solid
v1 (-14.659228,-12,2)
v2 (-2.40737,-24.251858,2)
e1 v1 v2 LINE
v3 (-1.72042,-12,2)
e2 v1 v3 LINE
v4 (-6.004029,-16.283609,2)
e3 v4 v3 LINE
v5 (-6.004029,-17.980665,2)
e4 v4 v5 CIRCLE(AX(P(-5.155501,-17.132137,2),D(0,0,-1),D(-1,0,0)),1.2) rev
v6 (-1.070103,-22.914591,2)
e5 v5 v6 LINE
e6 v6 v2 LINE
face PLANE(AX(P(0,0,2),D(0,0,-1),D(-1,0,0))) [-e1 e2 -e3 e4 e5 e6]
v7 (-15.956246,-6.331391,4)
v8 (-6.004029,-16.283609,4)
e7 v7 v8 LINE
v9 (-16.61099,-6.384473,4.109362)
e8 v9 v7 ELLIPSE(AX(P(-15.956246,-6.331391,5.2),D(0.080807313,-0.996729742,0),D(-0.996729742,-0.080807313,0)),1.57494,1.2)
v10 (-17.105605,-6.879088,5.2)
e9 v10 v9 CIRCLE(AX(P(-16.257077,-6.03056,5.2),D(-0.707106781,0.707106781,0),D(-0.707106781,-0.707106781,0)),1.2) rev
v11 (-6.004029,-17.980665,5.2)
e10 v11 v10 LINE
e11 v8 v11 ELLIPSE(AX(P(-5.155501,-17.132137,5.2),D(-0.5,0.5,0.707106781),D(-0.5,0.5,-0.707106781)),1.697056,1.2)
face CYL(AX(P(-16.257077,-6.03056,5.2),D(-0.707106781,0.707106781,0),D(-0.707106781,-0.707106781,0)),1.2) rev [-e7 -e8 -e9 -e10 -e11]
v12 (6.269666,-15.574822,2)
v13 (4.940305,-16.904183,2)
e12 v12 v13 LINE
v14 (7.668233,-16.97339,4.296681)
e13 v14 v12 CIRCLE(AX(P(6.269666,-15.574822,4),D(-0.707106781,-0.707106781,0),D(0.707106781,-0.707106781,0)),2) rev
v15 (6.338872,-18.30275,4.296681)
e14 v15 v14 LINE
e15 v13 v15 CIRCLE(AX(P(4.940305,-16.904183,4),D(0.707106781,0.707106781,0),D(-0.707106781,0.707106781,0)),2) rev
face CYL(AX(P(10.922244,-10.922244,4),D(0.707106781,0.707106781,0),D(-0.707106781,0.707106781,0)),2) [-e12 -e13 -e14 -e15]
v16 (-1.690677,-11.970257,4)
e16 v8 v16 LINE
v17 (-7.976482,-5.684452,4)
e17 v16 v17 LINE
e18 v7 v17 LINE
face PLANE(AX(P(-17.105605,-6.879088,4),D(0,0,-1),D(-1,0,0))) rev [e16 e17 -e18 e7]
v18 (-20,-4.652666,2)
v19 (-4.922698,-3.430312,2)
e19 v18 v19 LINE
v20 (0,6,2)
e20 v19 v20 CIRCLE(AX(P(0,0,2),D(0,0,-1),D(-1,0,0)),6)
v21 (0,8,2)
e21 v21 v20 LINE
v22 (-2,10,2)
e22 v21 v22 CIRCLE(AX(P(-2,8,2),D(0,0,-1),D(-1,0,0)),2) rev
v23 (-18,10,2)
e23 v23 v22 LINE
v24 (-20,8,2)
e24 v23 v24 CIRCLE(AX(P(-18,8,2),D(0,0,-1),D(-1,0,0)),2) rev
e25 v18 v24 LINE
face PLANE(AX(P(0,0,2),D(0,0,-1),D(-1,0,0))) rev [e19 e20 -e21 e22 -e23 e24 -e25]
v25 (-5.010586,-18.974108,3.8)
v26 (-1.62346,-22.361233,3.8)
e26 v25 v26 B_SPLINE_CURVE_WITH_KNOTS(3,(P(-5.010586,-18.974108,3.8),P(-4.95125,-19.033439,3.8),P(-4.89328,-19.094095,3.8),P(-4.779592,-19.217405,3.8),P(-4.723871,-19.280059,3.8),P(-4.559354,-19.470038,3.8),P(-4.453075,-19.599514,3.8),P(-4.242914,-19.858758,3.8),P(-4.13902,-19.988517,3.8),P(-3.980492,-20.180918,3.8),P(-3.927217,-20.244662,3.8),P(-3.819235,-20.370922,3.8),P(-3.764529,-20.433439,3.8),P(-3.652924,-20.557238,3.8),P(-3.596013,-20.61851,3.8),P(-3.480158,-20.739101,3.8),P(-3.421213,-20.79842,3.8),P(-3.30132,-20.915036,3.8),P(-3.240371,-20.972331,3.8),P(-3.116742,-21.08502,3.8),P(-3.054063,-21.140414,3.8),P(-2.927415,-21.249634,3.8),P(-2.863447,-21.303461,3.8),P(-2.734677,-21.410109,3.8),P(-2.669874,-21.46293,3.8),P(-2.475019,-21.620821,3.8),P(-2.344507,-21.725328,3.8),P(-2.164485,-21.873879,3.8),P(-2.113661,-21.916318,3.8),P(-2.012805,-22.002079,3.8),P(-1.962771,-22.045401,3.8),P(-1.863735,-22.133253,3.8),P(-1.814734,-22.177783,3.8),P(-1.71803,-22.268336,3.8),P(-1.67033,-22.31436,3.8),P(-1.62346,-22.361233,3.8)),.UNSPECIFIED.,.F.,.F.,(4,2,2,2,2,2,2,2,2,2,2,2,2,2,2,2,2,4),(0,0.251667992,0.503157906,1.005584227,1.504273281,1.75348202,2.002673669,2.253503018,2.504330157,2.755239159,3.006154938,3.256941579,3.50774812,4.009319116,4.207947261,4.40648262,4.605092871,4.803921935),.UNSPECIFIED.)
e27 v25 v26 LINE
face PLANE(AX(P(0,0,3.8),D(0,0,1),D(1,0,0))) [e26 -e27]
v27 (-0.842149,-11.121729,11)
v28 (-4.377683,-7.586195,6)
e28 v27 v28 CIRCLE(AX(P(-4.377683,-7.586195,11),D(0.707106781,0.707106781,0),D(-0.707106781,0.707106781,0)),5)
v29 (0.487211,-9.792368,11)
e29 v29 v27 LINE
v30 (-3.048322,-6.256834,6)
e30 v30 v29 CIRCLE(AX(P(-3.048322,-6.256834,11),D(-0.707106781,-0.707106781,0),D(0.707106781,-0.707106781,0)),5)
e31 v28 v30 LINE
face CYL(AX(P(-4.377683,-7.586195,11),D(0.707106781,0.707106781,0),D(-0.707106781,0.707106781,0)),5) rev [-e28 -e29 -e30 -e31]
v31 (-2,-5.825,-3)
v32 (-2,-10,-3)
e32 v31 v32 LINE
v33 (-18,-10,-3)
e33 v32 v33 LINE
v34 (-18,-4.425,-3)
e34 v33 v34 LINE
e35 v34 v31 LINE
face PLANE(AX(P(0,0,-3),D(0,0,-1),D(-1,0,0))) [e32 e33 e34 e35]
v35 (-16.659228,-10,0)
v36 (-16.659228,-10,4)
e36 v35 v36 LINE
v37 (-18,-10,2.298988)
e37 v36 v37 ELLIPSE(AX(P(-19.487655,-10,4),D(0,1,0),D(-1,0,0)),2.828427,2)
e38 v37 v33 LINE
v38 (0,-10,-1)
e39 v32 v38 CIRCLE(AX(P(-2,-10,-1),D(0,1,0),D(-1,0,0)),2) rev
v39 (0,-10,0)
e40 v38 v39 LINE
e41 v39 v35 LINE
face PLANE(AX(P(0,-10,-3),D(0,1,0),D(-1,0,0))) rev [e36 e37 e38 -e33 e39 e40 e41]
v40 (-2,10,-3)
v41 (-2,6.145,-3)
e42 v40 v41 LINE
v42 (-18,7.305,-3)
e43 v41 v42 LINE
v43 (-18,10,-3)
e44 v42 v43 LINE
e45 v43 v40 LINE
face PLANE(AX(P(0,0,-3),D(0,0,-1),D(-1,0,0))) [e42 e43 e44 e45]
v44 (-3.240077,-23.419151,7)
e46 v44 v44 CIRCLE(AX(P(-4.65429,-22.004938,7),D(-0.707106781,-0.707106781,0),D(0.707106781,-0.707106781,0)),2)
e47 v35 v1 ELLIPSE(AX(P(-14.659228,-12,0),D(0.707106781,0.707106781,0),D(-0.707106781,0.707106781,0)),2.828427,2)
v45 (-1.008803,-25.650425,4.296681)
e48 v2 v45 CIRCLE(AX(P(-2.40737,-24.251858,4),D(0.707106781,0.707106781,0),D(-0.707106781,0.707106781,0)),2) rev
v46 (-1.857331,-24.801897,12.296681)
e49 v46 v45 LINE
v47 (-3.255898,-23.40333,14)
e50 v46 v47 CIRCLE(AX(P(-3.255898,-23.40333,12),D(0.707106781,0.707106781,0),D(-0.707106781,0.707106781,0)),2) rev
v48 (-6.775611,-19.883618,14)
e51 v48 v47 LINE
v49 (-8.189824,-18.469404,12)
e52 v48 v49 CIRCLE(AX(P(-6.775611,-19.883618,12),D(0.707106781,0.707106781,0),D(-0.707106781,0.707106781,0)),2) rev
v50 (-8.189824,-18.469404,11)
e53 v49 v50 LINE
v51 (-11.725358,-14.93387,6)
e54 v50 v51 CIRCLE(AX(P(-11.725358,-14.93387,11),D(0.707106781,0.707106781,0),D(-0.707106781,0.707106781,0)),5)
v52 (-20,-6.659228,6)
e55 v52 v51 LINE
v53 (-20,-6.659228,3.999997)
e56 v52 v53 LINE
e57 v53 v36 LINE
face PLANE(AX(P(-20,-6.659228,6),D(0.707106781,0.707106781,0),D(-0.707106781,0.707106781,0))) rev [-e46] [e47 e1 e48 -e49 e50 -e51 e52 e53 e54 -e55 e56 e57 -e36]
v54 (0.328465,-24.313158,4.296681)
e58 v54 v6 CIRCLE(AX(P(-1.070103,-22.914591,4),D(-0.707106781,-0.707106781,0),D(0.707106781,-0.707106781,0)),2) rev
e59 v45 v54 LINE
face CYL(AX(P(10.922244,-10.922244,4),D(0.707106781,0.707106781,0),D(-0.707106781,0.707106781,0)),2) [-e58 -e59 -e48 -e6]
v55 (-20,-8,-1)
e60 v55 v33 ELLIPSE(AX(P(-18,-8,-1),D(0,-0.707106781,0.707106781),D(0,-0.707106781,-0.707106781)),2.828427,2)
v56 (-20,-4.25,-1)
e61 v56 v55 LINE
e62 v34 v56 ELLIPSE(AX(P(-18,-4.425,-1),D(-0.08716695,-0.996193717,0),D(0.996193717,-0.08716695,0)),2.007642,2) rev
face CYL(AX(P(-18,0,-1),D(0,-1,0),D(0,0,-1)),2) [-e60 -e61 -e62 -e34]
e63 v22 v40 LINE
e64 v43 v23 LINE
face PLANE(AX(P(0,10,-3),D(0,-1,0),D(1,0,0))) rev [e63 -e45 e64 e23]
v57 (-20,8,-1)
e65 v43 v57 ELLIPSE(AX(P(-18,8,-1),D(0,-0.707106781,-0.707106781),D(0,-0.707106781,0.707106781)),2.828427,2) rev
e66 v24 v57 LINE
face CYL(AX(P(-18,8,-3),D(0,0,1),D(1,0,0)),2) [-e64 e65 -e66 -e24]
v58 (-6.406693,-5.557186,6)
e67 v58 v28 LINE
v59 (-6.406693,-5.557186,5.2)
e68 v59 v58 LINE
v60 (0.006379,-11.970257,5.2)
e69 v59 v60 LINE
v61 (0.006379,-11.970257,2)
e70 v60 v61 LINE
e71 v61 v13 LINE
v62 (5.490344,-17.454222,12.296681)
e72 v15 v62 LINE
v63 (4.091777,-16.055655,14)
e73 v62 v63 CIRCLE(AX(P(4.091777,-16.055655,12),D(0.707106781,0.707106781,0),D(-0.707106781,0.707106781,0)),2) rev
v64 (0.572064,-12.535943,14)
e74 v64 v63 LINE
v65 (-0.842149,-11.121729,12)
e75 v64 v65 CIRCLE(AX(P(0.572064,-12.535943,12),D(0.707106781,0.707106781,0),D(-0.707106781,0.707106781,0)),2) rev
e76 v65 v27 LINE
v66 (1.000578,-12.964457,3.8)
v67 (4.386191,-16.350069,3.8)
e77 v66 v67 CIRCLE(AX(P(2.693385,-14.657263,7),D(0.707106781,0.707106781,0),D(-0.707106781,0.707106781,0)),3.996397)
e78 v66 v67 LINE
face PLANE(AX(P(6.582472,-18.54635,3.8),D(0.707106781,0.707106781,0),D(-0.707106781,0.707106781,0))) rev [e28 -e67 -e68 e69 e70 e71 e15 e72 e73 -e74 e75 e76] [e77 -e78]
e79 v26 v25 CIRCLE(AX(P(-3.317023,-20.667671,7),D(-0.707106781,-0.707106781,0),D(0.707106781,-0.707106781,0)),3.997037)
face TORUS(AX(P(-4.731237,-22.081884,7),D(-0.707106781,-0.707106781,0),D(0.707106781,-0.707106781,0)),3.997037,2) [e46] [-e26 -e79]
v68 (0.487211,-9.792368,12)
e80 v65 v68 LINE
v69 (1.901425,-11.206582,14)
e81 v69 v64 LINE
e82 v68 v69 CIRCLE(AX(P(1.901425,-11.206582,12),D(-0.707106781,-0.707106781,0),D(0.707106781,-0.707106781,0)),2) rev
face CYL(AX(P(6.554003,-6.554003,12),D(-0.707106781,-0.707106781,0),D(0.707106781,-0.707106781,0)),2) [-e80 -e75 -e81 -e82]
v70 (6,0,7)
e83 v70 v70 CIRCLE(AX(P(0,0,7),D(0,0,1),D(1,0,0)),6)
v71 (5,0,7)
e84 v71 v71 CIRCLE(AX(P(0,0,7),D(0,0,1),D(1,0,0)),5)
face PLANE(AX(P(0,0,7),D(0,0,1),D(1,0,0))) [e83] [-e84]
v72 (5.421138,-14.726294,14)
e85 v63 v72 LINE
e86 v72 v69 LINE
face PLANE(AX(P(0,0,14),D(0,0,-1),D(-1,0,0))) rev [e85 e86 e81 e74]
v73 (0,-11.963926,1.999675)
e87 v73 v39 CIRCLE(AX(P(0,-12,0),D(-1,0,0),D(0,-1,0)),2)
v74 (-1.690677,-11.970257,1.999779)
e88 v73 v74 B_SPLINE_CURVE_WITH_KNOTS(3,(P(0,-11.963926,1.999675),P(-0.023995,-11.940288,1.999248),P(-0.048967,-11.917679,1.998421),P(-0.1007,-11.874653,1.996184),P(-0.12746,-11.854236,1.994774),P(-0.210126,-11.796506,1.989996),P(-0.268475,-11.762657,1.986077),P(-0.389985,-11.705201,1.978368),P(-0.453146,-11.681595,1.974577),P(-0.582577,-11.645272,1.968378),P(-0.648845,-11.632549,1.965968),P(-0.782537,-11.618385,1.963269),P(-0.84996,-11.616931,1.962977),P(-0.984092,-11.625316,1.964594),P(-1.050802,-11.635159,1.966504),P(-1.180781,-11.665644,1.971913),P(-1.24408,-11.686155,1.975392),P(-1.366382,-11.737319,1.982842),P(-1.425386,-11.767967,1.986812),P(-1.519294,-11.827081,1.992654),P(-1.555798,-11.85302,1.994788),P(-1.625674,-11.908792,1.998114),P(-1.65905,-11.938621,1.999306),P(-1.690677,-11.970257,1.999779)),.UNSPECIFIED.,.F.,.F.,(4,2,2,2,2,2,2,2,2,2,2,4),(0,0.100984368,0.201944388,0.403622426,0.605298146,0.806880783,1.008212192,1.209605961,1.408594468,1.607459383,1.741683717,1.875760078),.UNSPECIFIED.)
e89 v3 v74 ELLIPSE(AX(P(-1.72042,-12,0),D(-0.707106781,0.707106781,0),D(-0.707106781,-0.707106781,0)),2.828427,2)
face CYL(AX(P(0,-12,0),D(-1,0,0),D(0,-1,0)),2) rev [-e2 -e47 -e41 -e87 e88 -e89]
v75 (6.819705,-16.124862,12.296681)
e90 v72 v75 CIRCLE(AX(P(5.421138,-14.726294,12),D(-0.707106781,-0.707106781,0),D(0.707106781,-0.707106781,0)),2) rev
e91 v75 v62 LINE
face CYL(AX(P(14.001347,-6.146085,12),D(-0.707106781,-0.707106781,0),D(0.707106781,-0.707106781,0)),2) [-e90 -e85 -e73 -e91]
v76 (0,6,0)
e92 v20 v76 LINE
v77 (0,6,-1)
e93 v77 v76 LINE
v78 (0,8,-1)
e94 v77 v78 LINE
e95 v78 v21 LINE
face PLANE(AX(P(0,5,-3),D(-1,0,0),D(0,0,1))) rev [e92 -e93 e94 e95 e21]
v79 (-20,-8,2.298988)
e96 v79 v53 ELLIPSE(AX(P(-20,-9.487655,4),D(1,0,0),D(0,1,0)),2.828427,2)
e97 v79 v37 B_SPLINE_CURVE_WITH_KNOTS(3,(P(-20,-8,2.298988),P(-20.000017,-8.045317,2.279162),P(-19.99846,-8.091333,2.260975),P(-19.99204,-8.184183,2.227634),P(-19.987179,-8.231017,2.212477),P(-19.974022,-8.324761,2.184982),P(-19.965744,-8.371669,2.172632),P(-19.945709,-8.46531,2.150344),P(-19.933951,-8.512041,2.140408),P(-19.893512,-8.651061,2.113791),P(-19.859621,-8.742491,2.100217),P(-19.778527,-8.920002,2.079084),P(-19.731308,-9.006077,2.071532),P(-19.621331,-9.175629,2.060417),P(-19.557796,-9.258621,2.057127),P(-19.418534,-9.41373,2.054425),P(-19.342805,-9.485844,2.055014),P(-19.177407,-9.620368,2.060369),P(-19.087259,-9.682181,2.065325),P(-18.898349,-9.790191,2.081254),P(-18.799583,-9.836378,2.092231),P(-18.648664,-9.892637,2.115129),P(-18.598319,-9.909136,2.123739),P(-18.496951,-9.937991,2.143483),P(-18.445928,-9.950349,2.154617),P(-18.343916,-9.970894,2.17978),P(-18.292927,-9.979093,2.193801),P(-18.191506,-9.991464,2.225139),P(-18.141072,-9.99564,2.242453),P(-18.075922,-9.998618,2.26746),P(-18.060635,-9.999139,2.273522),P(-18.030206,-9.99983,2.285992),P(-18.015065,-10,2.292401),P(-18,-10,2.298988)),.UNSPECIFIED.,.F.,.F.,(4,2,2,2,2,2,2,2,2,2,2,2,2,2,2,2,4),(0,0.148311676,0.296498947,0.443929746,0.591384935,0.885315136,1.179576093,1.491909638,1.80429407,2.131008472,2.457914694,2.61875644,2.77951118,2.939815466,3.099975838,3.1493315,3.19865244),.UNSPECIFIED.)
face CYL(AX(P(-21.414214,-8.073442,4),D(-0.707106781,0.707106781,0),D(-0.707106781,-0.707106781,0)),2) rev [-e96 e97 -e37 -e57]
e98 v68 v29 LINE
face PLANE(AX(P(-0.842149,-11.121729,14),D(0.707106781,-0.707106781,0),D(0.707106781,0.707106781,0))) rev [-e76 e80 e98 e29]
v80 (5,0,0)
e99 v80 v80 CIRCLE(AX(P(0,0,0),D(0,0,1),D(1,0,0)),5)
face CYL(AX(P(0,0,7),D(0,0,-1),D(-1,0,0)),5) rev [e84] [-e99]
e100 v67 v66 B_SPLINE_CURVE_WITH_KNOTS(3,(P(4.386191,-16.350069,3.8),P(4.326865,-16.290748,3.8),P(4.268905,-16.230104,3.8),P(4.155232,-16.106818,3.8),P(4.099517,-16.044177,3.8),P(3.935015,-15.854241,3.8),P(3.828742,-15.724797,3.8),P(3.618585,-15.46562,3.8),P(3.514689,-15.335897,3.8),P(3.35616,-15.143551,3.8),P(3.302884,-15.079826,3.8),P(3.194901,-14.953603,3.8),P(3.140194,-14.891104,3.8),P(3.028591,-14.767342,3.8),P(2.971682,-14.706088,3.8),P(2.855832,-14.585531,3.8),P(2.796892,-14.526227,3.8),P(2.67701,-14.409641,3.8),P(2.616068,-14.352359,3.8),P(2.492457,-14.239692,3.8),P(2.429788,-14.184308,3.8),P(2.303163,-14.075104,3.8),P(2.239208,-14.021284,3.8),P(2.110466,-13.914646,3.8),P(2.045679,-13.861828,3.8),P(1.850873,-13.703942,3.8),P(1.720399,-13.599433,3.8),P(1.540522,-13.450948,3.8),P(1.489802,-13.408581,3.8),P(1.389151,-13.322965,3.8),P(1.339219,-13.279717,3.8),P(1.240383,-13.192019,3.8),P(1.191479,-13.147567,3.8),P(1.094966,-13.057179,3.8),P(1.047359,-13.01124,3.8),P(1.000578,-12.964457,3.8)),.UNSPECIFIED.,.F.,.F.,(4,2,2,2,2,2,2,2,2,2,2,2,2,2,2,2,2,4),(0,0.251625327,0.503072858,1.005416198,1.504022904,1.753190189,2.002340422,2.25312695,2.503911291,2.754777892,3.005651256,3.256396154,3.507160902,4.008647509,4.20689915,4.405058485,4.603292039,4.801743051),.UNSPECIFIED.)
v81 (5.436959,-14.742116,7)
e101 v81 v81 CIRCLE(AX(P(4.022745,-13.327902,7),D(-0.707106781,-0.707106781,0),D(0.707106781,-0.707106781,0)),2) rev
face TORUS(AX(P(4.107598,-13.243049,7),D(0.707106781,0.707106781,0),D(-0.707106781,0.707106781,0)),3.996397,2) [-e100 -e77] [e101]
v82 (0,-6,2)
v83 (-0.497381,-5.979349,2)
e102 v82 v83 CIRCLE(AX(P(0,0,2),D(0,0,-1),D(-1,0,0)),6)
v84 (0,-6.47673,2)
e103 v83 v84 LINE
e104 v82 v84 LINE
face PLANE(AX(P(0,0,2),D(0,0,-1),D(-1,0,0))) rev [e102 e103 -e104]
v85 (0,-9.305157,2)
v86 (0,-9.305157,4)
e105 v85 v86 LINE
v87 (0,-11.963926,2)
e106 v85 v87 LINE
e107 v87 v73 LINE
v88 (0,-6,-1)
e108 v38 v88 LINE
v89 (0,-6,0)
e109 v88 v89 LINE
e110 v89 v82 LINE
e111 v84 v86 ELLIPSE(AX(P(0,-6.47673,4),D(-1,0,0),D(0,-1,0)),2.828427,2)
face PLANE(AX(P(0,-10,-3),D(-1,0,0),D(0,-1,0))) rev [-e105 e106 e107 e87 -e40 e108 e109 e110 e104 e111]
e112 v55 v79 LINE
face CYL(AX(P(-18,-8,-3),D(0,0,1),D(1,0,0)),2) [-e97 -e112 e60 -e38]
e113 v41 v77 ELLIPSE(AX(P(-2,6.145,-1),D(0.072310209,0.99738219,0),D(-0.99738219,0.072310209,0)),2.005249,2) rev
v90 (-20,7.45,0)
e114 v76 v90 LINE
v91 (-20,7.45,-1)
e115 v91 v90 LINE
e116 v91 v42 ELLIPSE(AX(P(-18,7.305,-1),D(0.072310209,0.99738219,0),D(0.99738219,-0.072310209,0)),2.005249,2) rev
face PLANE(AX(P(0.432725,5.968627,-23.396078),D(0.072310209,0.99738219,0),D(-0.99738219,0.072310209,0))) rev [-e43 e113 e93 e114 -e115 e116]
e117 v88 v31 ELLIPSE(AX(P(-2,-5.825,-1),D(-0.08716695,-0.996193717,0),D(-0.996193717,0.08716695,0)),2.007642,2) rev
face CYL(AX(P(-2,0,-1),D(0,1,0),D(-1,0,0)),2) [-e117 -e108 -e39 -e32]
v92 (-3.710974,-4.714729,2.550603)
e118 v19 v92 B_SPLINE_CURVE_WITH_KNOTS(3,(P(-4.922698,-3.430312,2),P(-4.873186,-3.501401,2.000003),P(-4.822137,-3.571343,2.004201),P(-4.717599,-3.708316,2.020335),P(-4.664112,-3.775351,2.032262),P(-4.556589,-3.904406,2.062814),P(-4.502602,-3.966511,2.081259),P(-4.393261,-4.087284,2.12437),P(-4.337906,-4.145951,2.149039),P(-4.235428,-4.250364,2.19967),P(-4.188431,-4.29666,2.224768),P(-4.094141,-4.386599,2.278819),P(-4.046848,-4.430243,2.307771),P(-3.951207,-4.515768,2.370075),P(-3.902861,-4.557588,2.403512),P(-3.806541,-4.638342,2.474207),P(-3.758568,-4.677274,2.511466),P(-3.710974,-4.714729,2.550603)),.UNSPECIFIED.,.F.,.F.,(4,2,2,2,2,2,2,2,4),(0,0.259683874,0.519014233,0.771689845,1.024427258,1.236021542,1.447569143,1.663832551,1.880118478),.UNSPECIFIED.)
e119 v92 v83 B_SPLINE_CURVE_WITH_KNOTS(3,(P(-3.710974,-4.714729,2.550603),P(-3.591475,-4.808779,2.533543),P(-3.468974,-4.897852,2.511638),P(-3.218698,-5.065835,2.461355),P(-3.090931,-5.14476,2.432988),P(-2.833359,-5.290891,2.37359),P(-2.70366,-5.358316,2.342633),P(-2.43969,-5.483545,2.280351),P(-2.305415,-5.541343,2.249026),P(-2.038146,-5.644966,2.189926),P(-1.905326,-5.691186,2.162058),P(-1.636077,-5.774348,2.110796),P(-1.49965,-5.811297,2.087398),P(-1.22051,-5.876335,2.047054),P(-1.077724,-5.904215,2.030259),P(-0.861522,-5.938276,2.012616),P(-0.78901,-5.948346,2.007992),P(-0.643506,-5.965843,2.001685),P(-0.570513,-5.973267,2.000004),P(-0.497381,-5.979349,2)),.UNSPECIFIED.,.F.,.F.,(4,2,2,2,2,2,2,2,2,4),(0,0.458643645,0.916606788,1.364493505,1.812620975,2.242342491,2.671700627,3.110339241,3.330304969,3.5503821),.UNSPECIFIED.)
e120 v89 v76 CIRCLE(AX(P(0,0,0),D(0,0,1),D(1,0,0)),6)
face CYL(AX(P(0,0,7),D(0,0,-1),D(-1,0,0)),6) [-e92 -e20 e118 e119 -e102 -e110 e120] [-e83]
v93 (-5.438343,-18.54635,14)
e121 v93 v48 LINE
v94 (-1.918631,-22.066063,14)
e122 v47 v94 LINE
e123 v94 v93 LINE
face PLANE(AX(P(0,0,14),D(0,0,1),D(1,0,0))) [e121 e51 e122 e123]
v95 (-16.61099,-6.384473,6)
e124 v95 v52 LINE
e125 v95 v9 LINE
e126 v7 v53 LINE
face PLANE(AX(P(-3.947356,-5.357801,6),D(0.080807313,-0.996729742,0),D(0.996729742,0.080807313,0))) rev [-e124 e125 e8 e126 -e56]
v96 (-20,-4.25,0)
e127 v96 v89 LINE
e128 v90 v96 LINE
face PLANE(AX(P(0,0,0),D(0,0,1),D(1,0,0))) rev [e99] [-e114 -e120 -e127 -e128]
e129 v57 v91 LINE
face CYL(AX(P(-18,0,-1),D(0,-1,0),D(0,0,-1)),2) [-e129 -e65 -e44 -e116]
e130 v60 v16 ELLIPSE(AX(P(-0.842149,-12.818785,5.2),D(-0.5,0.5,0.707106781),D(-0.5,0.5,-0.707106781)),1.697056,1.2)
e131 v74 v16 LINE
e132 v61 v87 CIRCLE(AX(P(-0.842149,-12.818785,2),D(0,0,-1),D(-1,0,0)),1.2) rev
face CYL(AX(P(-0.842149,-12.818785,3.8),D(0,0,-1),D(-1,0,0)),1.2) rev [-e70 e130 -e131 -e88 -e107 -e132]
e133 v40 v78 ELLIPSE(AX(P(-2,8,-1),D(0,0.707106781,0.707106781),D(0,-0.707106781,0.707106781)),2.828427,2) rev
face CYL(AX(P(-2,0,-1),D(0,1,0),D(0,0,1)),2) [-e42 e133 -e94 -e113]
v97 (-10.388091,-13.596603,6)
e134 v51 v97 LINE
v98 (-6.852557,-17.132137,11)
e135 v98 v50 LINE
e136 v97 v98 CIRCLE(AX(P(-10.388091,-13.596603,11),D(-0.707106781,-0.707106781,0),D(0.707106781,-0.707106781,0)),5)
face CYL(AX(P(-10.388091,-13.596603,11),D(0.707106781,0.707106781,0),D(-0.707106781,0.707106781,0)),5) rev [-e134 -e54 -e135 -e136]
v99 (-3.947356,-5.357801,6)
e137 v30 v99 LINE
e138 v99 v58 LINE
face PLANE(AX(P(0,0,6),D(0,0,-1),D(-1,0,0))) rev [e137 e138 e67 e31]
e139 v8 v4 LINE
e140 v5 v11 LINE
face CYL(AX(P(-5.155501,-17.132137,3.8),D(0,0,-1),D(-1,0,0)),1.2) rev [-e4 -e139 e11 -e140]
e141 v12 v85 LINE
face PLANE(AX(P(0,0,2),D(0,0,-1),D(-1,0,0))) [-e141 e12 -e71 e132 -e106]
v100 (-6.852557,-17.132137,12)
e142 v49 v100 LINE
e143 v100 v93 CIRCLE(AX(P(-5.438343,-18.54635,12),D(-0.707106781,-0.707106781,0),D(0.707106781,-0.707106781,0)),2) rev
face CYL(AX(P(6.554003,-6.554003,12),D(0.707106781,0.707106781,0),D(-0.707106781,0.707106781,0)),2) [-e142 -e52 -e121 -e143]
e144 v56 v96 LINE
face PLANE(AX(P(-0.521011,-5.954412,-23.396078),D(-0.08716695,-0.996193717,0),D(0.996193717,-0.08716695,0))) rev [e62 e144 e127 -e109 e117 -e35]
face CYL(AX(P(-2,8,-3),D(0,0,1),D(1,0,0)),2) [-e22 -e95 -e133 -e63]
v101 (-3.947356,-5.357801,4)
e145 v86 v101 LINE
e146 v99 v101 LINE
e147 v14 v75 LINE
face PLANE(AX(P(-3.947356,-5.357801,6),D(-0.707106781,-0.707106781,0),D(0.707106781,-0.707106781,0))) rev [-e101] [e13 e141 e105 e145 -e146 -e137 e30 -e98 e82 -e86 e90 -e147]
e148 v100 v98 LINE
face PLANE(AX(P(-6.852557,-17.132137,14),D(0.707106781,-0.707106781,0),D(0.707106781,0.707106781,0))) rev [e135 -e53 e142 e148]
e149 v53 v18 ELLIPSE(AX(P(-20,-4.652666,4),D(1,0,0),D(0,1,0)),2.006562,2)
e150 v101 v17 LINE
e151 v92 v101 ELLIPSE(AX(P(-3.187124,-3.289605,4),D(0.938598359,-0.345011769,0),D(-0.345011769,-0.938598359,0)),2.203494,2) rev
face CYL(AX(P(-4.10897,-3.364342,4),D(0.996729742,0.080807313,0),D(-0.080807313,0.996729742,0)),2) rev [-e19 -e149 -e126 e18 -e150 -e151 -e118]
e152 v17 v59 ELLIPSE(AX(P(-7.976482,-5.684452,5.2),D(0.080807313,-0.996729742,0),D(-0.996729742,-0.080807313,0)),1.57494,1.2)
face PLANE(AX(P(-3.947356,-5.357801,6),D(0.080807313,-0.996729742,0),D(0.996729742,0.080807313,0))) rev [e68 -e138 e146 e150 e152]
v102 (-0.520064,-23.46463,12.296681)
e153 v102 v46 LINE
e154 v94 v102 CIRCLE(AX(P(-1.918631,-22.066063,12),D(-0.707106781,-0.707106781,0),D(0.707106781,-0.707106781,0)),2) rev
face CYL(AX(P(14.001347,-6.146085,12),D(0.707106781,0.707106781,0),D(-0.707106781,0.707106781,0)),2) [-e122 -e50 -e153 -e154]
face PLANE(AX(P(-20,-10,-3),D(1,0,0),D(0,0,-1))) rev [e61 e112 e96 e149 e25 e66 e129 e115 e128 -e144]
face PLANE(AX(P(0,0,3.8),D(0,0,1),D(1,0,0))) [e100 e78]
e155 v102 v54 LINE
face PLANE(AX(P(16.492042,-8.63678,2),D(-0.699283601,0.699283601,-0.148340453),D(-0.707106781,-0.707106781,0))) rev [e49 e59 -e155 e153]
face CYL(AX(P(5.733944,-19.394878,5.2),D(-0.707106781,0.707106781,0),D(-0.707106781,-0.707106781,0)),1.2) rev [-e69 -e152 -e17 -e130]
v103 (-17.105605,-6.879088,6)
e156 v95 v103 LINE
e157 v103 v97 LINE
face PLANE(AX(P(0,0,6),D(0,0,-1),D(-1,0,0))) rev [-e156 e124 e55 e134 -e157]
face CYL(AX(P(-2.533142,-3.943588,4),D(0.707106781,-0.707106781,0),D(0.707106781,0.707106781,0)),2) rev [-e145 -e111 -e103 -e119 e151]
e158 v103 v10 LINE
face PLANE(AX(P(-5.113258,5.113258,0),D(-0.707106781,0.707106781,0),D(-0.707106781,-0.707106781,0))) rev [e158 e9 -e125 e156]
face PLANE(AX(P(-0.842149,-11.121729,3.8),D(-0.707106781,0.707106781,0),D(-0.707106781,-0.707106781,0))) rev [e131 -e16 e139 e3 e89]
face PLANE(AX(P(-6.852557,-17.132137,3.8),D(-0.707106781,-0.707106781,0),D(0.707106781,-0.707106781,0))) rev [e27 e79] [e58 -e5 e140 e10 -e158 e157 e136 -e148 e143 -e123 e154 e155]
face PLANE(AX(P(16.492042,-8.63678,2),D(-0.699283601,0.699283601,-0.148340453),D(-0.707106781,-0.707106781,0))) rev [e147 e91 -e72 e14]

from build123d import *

# Parameters (mm, degrees)
CROQUIS1_R                   = 6
CROQUIS1_R_2                 = 5
SALIENTE_EXTRUIR1_DEPTH      = 7
SALIENTE_EXTRUIR2_DEPTH      = 3
SALIENTE_EXTRUIR2_DEPTH_BACK = 2
CROQUIS4_W                   = 20
CROQUIS4_H                   = 16.5
CORTAR_EXTRUIR1_DEPTH        = 4
SALIENTE_EXTRUIR7_DEPTH      = 4
CORTAR_EXTRUIR4_DEPTH        = 4
CORTAR_EXTRUIR5_DEPTH        = 2.2
SALIENTE_EXTRUIR9_DEPTH      = 8
CORTAR_EXTRUIR6_REACH        = 36.518
CROQUIS13_R                  = 2
REDONDEO1_R                  = 2
CROQUIS14_W                  = 1.8
CROQUIS14_H                  = 8.5
CORTAR_EXTRUIR7_DEPTH        = 10.5
CROQUIS15_W                  = 2
CROQUIS15_H                  = 8.5
CORTAR_EXTRUIR8_DEPTH        = 14.5
REDONDEO2_R                  = 2
REDONDEO3_R                  = 2
REDONDEO4_R                  = 5
CORTAR_EXTRUIR9_REACH        = 36.518
REDONDEO5_R                  = 2
REDONDEO6_R                  = 1.2
SALIENTE_EXTRUIR12_START     = 1
SALIENTE_EXTRUIR12_DEPTH     = 1
SALIENTE_EXTRUIR13_DEPTH     = 3
REDONDEO7_R                  = 2


with BuildPart() as part:
    # Croquis1 → Saliente-Extruir1 (new body)
    with BuildSketch(Plane.XY):
        Circle(CROQUIS1_R)
        Circle(CROQUIS1_R_2, mode=Mode.SUBTRACT)
    extrude(amount=SALIENTE_EXTRUIR1_DEPTH)

    # Croquis2 → Saliente-Extruir2 (add, two sides: drawn at the far end of the back side and taken through both)
    with BuildSketch(Plane(origin=(0, 0, 0), x_dir=(-1, 0, 0), z_dir=(0, 0, -1)).offset(-SALIENTE_EXTRUIR2_DEPTH_BACK)):
        with BuildLine():
            Line((0, -10), (0, -5))
            ThreePointArc((0, -5), (5, 0), (0, 5))
            Line((0, 5), (0, 10))
            Line((0, 10), (20, 10))
            Line((20, 10), (20, -10))
            Line((20, -10), (0, -10))
        make_face()
    extrude(amount=SALIENTE_EXTRUIR2_DEPTH + SALIENTE_EXTRUIR2_DEPTH_BACK)

    # Croquis4 → Cortar-Extruir1 (cut)
    with BuildSketch(Plane(origin=(0, 0, -3), x_dir=(-1, 0, 0), z_dir=(0, 0, -1))):
        with Locations((10, 0)):
            Rectangle(CROQUIS4_W, CROQUIS4_H)
    extrude(amount=-CORTAR_EXTRUIR1_DEPTH, mode=Mode.SUBTRACT)

    # Croquis5 → Saliente-Extruir7 (add)
    with BuildSketch(Plane.XY.offset(2)):
        Polygon((-3.9473557, -5.357801084), (-20, -6.659228144), (0.707205479, -27.366433624), (16.75984978, -26.065006564), align=None)
    extrude(amount=SALIENTE_EXTRUIR7_DEPTH)

    # Croquis10 → Cortar-Extruir4 (cut)
    with BuildSketch(Plane.XY.offset(6)):
        Polygon((-0.765202985, -25.894025159), (7.911832695, -17.216989479), (16.75984978, -26.065006564), (0.707205479, -27.366433624), align=None)
    extrude(amount=-CORTAR_EXTRUIR4_DEPTH, mode=Mode.SUBTRACT)

    # Croquis11 → Cortar-Extruir5 (cut)
    with BuildSketch(Plane.XY.offset(6)):
        Polygon((0.572064306, -24.556757867), (6.582471946, -18.546350227), (-0.842149256, -11.121729025), (-6.852556896, -17.132136665), align=None)
    extrude(amount=-CORTAR_EXTRUIR5_DEPTH, mode=Mode.SUBTRACT)

    # Croquis12 → Saliente-Extruir9 (add)
    with BuildSketch(Plane.XY.offset(6)):
        Polygon((-6.852556896, -17.132136665), (-8.189824188, -18.469403956), (-0.765202985, -25.894025159), (0.572064306, -24.556757867), align=None)
        Polygon((-0.842149256, -11.121729025), (0.487211492, -9.792368276), (7.911832695, -17.216989479), (6.582471946, -18.546350227), align=None)
    extrude(amount=SALIENTE_EXTRUIR9_DEPTH)

    # Cortar-Extruir6: up to this face of the body (flat: up to its plane)
    cortar_extruir6_end = Plane(part.part.faces().sort_by_distance((3.21499462, -12.520151404, 7.335855075))[0])
    # Croquis13 → Cortar-Extruir6 (cut, up to the picked face)
    with BuildSketch(Plane(origin=(-13.329614072, -13.329614072, 0), x_dir=(0, 0, 1), z_dir=(-0.7071067811865488, -0.7071067811865462, 0)), mode=Mode.PRIVATE) as cortar_extruir6_sk1:
        with Locations(Location((7, -12.268760562, 0), (0, 0, 270))):
            Circle(CROQUIS13_R)
    cortar_extruir6_tool1 = split(extrude(cortar_extruir6_sk1.sketch, amount=-CORTAR_EXTRUIR6_REACH, mode=Mode.PRIVATE), bisect_by=cortar_extruir6_end, keep=Keep.BOTH, mode=Mode.PRIVATE)
    add(cortar_extruir6_tool1.solids().sort_by(Axis((-4.65429, -22.004938, 7), (0.7071067811865488, 0.7071067811865462, 0)))[0], mode=Mode.SUBTRACT)

    # Redondeo1
    # the kernel refuses this fillet: 2 mm, written as the material it takes off along each edge
    with BuildSketch(Plane(origin=(-3.31702299, -20.667670571, 7), x_dir=(0.7071067811865459, -0.7071067811865492, 0), z_dir=(0, 0, -1))) as redondeo1_piece_1_section:
        with BuildLine():
            CenterArc((3.997037442, 2), REDONDEO1_R, 183.11895941, 86.88104059)
            Line((2, 1.89118154), (1.960059251, 1.889005171))
            ThreePointArc((1.960059251, 1.889005171), (1.96, 0.94559077), (1.96, 0))
            Line((1.96, 0), (2, -0.04))
            Line((2, -0.04), (3.997037442, -0.04))
            Line((3.997037442, -0.04), (3.997037442, 0))
        make_face()
    redondeo1_piece_1 = revolve(axis=Axis((-3.31702299, -20.667670571, 7), (-0.7071067811865488, -0.7071067811865462, 0)), mode=Mode.PRIVATE)
    redondeo1_piece_1 = split(redondeo1_piece_1, bisect_by=Plane(origin=(-3.31702299, -20.667670571, 3.8), z_dir=(0, 0, 1)), keep=Keep.TOP, mode=Mode.PRIVATE)
    add(redondeo1_piece_1, mode=Mode.SUBTRACT)
    with BuildSketch(Plane(origin=(2.69338465, -14.657262931, 7), x_dir=(0.7071067811865458, -0.7071067811865493, 0), z_dir=(0, 0, -1))) as redondeo1_piece_2_section:
        with BuildLine():
            CenterArc((3.996396754, -2), REDONDEO1_R, 90, 86.560187232)
            Line((3.996396754, 0), (3.996396754, 0.04))
            Line((3.996396754, 0.04), (2, 0.04))
            Line((2, 0.04), (1.96, 0))
            ThreePointArc((1.96, 0), (1.96, -0.94), (1.960072065, -1.8776))
            Line((1.960072065, -1.8776), (2, -1.88))
        make_face()
    redondeo1_piece_2 = revolve(axis=Axis((2.69338465, -14.657262931, 7), (-0.7071067811865488, -0.7071067811865462, 0)), mode=Mode.PRIVATE)
    redondeo1_piece_2 = split(redondeo1_piece_2, bisect_by=Plane(origin=(2.69338465, -14.657262931, 3.8), z_dir=(0, 0, 1)), keep=Keep.TOP, mode=Mode.PRIVATE)
    add(redondeo1_piece_2, mode=Mode.SUBTRACT)

    # Croquis14 → Cortar-Extruir7 (cut)
    with BuildSketch(Plane(origin=(12.564411087, -12.564411087, 0), x_dir=(0, 0, -1), z_dir=(0.7071067811865477, -0.7071067811865474, 0))):
        with Locations((-2.9, -12.709739462)):
            Rectangle(CROQUIS14_W, CROQUIS14_H)
    extrude(amount=-CORTAR_EXTRUIR7_DEPTH, mode=Mode.SUBTRACT)

    # Croquis15 → Cortar-Extruir8 (cut)
    with BuildSketch(Plane(origin=(5.139789884, -5.139789884, 0), x_dir=(0, 0, -1), z_dir=(0.7071067811865476, -0.7071067811865476, 0))):
        with Locations((-5, -12.709739462)):
            Rectangle(CROQUIS15_W, CROQUIS15_H)
    extrude(amount=-CORTAR_EXTRUIR8_DEPTH, mode=Mode.SUBTRACT)

    # Redondeo2
    # the kernel refuses this fillet: 2 mm, written as the material it adds along each edge
    with BuildSketch(Plane(origin=(-21.659228144, -10, 2), x_dir=(0, -1, 0), z_dir=(1, 0, 0))) as redondeo2_piece_1_section:
        with BuildLine():
            CenterArc((REDONDEO2_R, REDONDEO2_R), REDONDEO2_R, 180, 90)
            Line((0, REDONDEO2_R), (0, 0))
            Line((0, 0), (REDONDEO2_R, 0))
        make_face()
    redondeo2_piece_1 = extrude(amount=21.659228144, mode=Mode.PRIVATE)
    redondeo2_piece_1 = split(redondeo2_piece_1, bisect_by=Plane(origin=(-19.159228144, -7.5, 2), z_dir=(0.7071067811865488, 0.7071067811865464, 0)), keep=Keep.TOP, mode=Mode.PRIVATE)
    redondeo2_piece_1 = split(redondeo2_piece_1, bisect_by=Plane(origin=(-10.689824188, -20.969403956, 2), z_dir=(-0.7071067811865477, 0.7071067811865474, 0)), keep=Keep.TOP, mode=Mode.PRIVATE)
    add(redondeo2_piece_1)
    with BuildSketch(Plane(origin=(-21.659228144, -10, 2), x_dir=(0, -1, 0), z_dir=(1, 0, 0))) as redondeo2_piece_2_section:
        with BuildLine():
            CenterArc((REDONDEO2_R, REDONDEO2_R), REDONDEO2_R, 180, 90)
            Line((0, REDONDEO2_R), (0, 0))
            Line((0, 0), (REDONDEO2_R, 0))
        make_face()
    redondeo2_piece_2 = extrude(amount=21.659228144, mode=Mode.PRIVATE)
    redondeo2_piece_2 = split(redondeo2_piece_2, bisect_by=Plane(origin=(-11.811553213, -0.152325068, 2), z_dir=(0.7071067811865476, 0.7071067811865476, 0)), keep=Keep.TOP, mode=Mode.PRIVATE)
    add(redondeo2_piece_2)
    with BuildSketch(Plane(origin=(3.535533906, -12.84069069, 2), x_dir=(0.7071067811865488, 0.7071067811865464, 0), z_dir=(-0.7071067811865464, 0.7071067811865488, 0))) as redondeo2_piece_3_section:
        with BuildLine():
            CenterArc((REDONDEO2_R, -REDONDEO2_R), REDONDEO2_R, 90, 90)
            Line((0, -REDONDEO2_R), (0, 0))
            Line((0, 0), (REDONDEO2_R, 0))
        make_face()
    redondeo2_piece_3 = extrude(amount=15.582403966, mode=Mode.PRIVATE)
    redondeo2_piece_3 = split(redondeo2_piece_3, bisect_by=Plane(origin=(0, -12.84069069, 2), z_dir=(-1, 0, 0)), keep=Keep.TOP, mode=Mode.PRIVATE)
    redondeo2_piece_3 = split(redondeo2_piece_3, bisect_by=Plane(origin=(2.883977199, -4.80396825, 2), z_dir=(0.0808073133091507, -0.9967297417634114, 0)), keep=Keep.TOP, mode=Mode.PRIVATE)
    add(redondeo2_piece_3)
    with BuildSketch(Plane(origin=(1.036293009, -4.953764518, 2), x_dir=(-0.08080731330915071, 0.9967297417634114, 0), z_dir=(-0.9967297417634114, -0.0808073133091507, 0))) as redondeo2_piece_4_section:
        with BuildLine():
            CenterArc((REDONDEO2_R, -REDONDEO2_R), REDONDEO2_R, 90, 90)
            Line((0, -REDONDEO2_R), (0, 0))
            Line((0, 0), (REDONDEO2_R, 0))
        make_face()
    redondeo2_piece_4 = extrude(amount=26.105312832, mode=Mode.PRIVATE)
    redondeo2_piece_4 = split(redondeo2_piece_4, bisect_by=Plane(origin=(-20, -4.953764518, 2), z_dir=(1, 0, 0)), keep=Keep.TOP, mode=Mode.PRIVATE)
    redondeo2_piece_4 = split(redondeo2_piece_4, bisect_by=Plane(origin=(-1.657549628, -7.647607155, 2), z_dir=(-0.7071067811865488, -0.7071067811865464, 0)), keep=Keep.TOP, mode=Mode.PRIVATE)
    add(redondeo2_piece_4)
    with BuildSketch(Plane(origin=(3.535533906, -12.84069069, 2), x_dir=(0.7071067811865488, 0.7071067811865464, 0), z_dir=(-0.7071067811865464, 0.7071067811865488, 0))) as redondeo2_piece_5a_section:
        with BuildLine():
            CenterArc((REDONDEO2_R, -REDONDEO2_R), REDONDEO2_R, 90, 90)
            Line((0, -REDONDEO2_R), (0, 0))
            Line((0, 0), (REDONDEO2_R, 0))
        make_face()
    redondeo2_piece_5a = extrude(amount=15.582403966, mode=Mode.PRIVATE)
    redondeo2_piece_5a = redondeo2_piece_5a - Plane(origin=(0, 0, 2), x_dir=(1, 0, 0), z_dir=(0, 0, -1)) * Cylinder(6, 40, mode=Mode.PRIVATE)
    redondeo2_piece_5a = split(redondeo2_piece_5a, bisect_by=Plane(origin=(2.883977199, -4.80396825, 2), z_dir=(-0.0808073133091507, 0.9967297417634114, 0)), keep=Keep.TOP, mode=Mode.PRIVATE)
    with BuildSketch(Plane(origin=(1.036293009, -4.953764518, 2), x_dir=(-0.08080731330915071, 0.9967297417634114, 0), z_dir=(-0.9967297417634114, -0.0808073133091507, 0))) as redondeo2_piece_5b_section:
        with BuildLine():
            CenterArc((REDONDEO2_R, -REDONDEO2_R), REDONDEO2_R, 90, 90)
            Line((0, -REDONDEO2_R), (0, 0))
            Line((0, 0), (REDONDEO2_R, 0))
        make_face()
    redondeo2_piece_5b = extrude(amount=26.105312832, mode=Mode.PRIVATE)
    redondeo2_piece_5b = redondeo2_piece_5b - Plane(origin=(0, 0, 2), x_dir=(1, 0, 0), z_dir=(0, 0, -1)) * Cylinder(6, 61, mode=Mode.PRIVATE)
    redondeo2_piece_5b = split(redondeo2_piece_5b, bisect_by=Plane(origin=(-1.657549628, -7.647607155, 2), z_dir=(0.7071067811865488, 0.7071067811865464, 0)), keep=Keep.TOP, mode=Mode.PRIVATE)
    redondeo2_piece_5 = redondeo2_piece_5a & redondeo2_piece_5b
    add(redondeo2_piece_5)

    # Redondeo3
    redondeo3_edges = [part.edges().sort_by_distance(p)[0] for p in [
        (-18.329614072, -8.329614072, 2),
    ]]
    fillet(redondeo3_edges, radius=REDONDEO3_R)

    # Redondeo4
    redondeo4_edges = [part.edges().sort_by_distance(p)[0] for p in [
        (-7.521190542, -17.800770311, 6),
        (-0.177468882, -10.457048651, 6),
    ]]
    fillet(redondeo4_edges, radius=REDONDEO4_R)

    # Cortar-Extruir9: up to this face of the body (flat: up to its plane)
    cortar_extruir9_end = Plane(part.part.faces().sort_by_distance((-3.497839057, -5.807317727, 5.793776651))[0])
    # Croquis16 → Cortar-Extruir9 (cut, up to the picked face)
    with BuildSketch(Plane(origin=(-13.329614072, -13.329614072, 0), x_dir=(0, 0, 1), z_dir=(-0.7071067811865488, -0.7071067811865462, 0)), mode=Mode.PRIVATE) as cortar_extruir9_sk1:
        Polygon((2, -17.768760562), (14, -15.968760562), (14, -17.768760562), align=None)
    cortar_extruir9_tool1 = split(extrude(cortar_extruir9_sk1.sketch, amount=-CORTAR_EXTRUIR9_REACH, mode=Mode.PRIVATE), bisect_by=cortar_extruir9_end, keep=Keep.BOTH, mode=Mode.PRIVATE)
    add(cortar_extruir9_tool1.solids().sort_by(Axis((-1.189467, -25.469761, 10), (0.7071067811865488, 0.7071067811865462, 0)))[0], mode=Mode.SUBTRACT)

    # Redondeo5
    redondeo5_edges = [part.edges().sort_by_distance(p)[0] for p in [
        (-7.521190542, -17.800770311, 14),
        (-0.177468882, -10.457048651, 14),
        (-0.09656934, -25.225391513, 2),
        (-1.369361546, -23.952599307, 14),
        (5.974360114, -16.608877647, 14),
        (7.24715232, -17.881669853, 2),
    ]]
    fillet(redondeo5_edges, radius=REDONDEO5_R)

    # Redondeo6
    # the kernel refuses this fillet: 1.2 mm, written as the material it adds along each edge
    with BuildSketch(Plane(origin=(-6.852556896, -17.132136665, 4), x_dir=(0.7071067811865482, -0.7071067811865468, 0), z_dir=(0, 0, -1))) as redondeo6_piece_1:
        with BuildLine():
            CenterArc((REDONDEO6_R, -REDONDEO6_R), REDONDEO6_R, 90, 90)
            Line((0, -REDONDEO6_R), (0, 0))
            Line((0, 0), (REDONDEO6_R, 0))
        make_face()
    extrude(amount=2)
    with BuildSketch(Plane(origin=(-0.842149256, -11.121729025, -1.2031583), x_dir=(-0.7071067811865542, -0.7071067811865409, -7.347476233374363e-14), z_dir=(0, 0, 1))) as redondeo6_piece_2_section:
        with BuildLine():
            CenterArc((REDONDEO6_R, REDONDEO6_R), REDONDEO6_R, 180, 90)
            Line((0, REDONDEO6_R), (0, 0))
            Line((0, 0), (REDONDEO6_R, 0))
        make_face()
    redondeo6_piece_2 = extrude(amount=5.2031583, mode=Mode.PRIVATE)
    redondeo6_piece_2 = redondeo6_piece_2 - Plane(origin=(-0.842149256, -12, 0), x_dir=(0, -1, 0), z_dir=(-1, 0, 0)) * Cylinder(2, 16, mode=Mode.PRIVATE)
    redondeo6_piece_2 = split(redondeo6_piece_2, bisect_by=Plane(origin=(0, -11.121729025, -1.2031583), z_dir=(-1, 0, 0)), keep=Keep.TOP, mode=Mode.PRIVATE)
    add(redondeo6_piece_2)
    with BuildSketch(Plane(origin=(-0.842149256, -11.121729025, -1.2031583), x_dir=(-0.7071067811865542, -0.7071067811865409, -7.347476233374363e-14), z_dir=(0, 0, 1))) as redondeo6_piece_3_section:
        with BuildLine():
            CenterArc((REDONDEO6_R, REDONDEO6_R), REDONDEO6_R, 180, 90)
            Line((0, REDONDEO6_R), (0, 0))
            Line((0, 0), (REDONDEO6_R, 0))
        make_face()
    redondeo6_piece_3 = extrude(amount=5.2031583, mode=Mode.PRIVATE)
    redondeo6_piece_3 = split(redondeo6_piece_3, bisect_by=Plane(origin=(-0.842149256, -11.121729025, 2), z_dir=(0, 0, 1)), keep=Keep.TOP, mode=Mode.PRIVATE)
    add(redondeo6_piece_3)
    with BuildSketch(Plane(origin=(-6.852556896, -17.132136665, 4), x_dir=(0, 0, 1), z_dir=(-0.7071067811865476, 0.7071067811865476, 0))) as redondeo6_piece_4_section:
        with BuildLine():
            CenterArc((REDONDEO6_R, REDONDEO6_R), REDONDEO6_R, 180, 90)
            Line((0, REDONDEO6_R), (0, 0))
            Line((0, 0), (REDONDEO6_R, 0))
        make_face()
    redondeo6_piece_4 = extrude(amount=17.5, mode=Mode.PRIVATE)
    redondeo6_piece_4 = split(redondeo6_piece_4, bisect_by=Plane(origin=(-7.781927379, -5.668679171, 4), z_dir=(0.08080731330903411, -0.9967297417634209, 0)), keep=Keep.TOP, mode=Mode.PRIVATE)
    add(redondeo6_piece_4)
    with BuildSketch(Plane(origin=(-0.842149256, -11.121729025, 4), x_dir=(0, 0, 1), z_dir=(-0.7071067811865476, 0.7071067811865476, 0))) as redondeo6_piece_5_section:
        with BuildLine():
            CenterArc((REDONDEO6_R, -REDONDEO6_R), REDONDEO6_R, 90, 90)
            Line((0, -REDONDEO6_R), (0, 0))
            Line((0, 0), (REDONDEO6_R, 0))
        make_face()
    redondeo6_piece_5 = extrude(amount=10.869452862, mode=Mode.PRIVATE)
    redondeo6_piece_5 = split(redondeo6_piece_5, bisect_by=Plane(origin=(-1.326670052, -5.145335701, 4), z_dir=(0.08080731330903411, -0.9967297417634209, 0)), keep=Keep.TOP, mode=Mode.PRIVATE)
    add(redondeo6_piece_5)
    with BuildSketch(Plane(origin=(-6.852556896, -17.132136665, 7), x_dir=(0.7071067811865482, -0.7071067811865468, 0), z_dir=(0, 0, -1))) as redondeo6_piece_6a_section:
        with BuildLine():
            CenterArc((REDONDEO6_R, -REDONDEO6_R), REDONDEO6_R, 90, 90)
            Line((0, -REDONDEO6_R), (0, 0))
            Line((0, 0), (REDONDEO6_R, 0))
        make_face()
    redondeo6_piece_6a = extrude(amount=5, mode=Mode.PRIVATE)
    redondeo6_piece_6a = split(redondeo6_piece_6a, bisect_by=Plane(origin=(-6.852556896, -17.132136665, 4), z_dir=(0, 0, 1)), keep=Keep.TOP, mode=Mode.PRIVATE)
    with BuildSketch(Plane(origin=(-4.731236553, -19.253457008, 4), x_dir=(0, 0, 1), z_dir=(-0.7071067811865476, 0.7071067811865476, 0))) as redondeo6_piece_6b_section:
        with BuildLine():
            CenterArc((REDONDEO6_R, REDONDEO6_R), REDONDEO6_R, 180, 90)
            Line((0, REDONDEO6_R), (0, 0))
            Line((0, 0), (REDONDEO6_R, 0))
        make_face()
    redondeo6_piece_6b = extrude(amount=17.5, mode=Mode.PRIVATE)
    redondeo6_piece_6b = split(redondeo6_piece_6b, bisect_by=Plane(origin=(-6.852556896, -17.132136665, 4), z_dir=(0.7071067811865476, -0.7071067811865476, 0)), keep=Keep.TOP, mode=Mode.PRIVATE)
    redondeo6_piece_6 = redondeo6_piece_6a & redondeo6_piece_6b
    add(redondeo6_piece_6)
    with BuildSketch(Plane(origin=(-0.842149256, -11.121729025, -1.2031583), x_dir=(-0.7071067811865542, -0.7071067811865409, -7.347476233374363e-14), z_dir=(0, 0, 1))) as redondeo6_piece_7a_section:
        with BuildLine():
            CenterArc((REDONDEO6_R, REDONDEO6_R), REDONDEO6_R, 180, 90)
            Line((0, REDONDEO6_R), (0, 0))
            Line((0, 0), (REDONDEO6_R, 0))
        make_face()
    redondeo6_piece_7a = extrude(amount=8.2031583, mode=Mode.PRIVATE)
    redondeo6_piece_7a = split(redondeo6_piece_7a, bisect_by=Plane(origin=(-0.842149256, -11.121729025, 4), z_dir=(0, 0, 1)), keep=Keep.TOP, mode=Mode.PRIVATE)
    with BuildSketch(Plane(origin=(1.279171087, -13.243049368, 4), x_dir=(0, 0, 1), z_dir=(-0.7071067811865476, 0.7071067811865476, 0))) as redondeo6_piece_7b_section:
        with BuildLine():
            CenterArc((REDONDEO6_R, -REDONDEO6_R), REDONDEO6_R, 90, 90)
            Line((0, -REDONDEO6_R), (0, 0))
            Line((0, 0), (REDONDEO6_R, 0))
        make_face()
    redondeo6_piece_7b = extrude(amount=13.869452862, mode=Mode.PRIVATE)
    redondeo6_piece_7b = split(redondeo6_piece_7b, bisect_by=Plane(origin=(-0.842149256, -11.121729025, 4), z_dir=(0.7071067811865476, -0.7071067811865476, 0)), keep=Keep.TOP, mode=Mode.PRIVATE)
    redondeo6_piece_7 = redondeo6_piece_7a & redondeo6_piece_7b
    add(redondeo6_piece_7)

    # Croquis20 → Saliente-Extruir12 (add)
    with BuildSketch(Plane(origin=(0, 0, 1), x_dir=(-1, 0, 0), z_dir=(0, 0, -1)).offset(SALIENTE_EXTRUIR12_START)):
        with BuildLine():
            Line((0, -8.25), (20, -8.25))
            Line((20, -8.25), (20, 8.25))
            Line((20, 8.25), (0, 8.25))
            Line((0, 8.25), (0, 6))
            Line((0, 6), (0, 5))
            ThreePointArc((0, 5), (5, 0), (0, -5))
            Line((0, -5), (0, -6))
            Line((0, -6), (0, -8.25))
        make_face()
    extrude(amount=-SALIENTE_EXTRUIR12_DEPTH)

    # Croquis21 → Saliente-Extruir13 (add)
    with BuildSketch(Plane(origin=(0, 0, 0), x_dir=(-1, 0, 0), z_dir=(0, 0, -1))):
        Polygon((0, -8.25), (20, -8.25), (20, -4.25), (0, -6), align=None)
        Polygon((0, 6), (20, 7.45), (20, 8.25), (0, 8.25), align=None)
    extrude(amount=SALIENTE_EXTRUIR13_DEPTH)

    # Redondeo7
    redondeo7_edges = [part.edges().sort_by_distance(p)[0] for p in [
        (-20, -10, -0.5),
        (-20, 10, -0.5),
        (-20, 8.725, -3),
        (-20, -7.125, -3),
        (0, -8, -3),
        (0, 8, -3),
        (0, 10, -0.5),
    ]]
    fillet(redondeo7_edges, radius=REDONDEO7_R)


solid = part.part
